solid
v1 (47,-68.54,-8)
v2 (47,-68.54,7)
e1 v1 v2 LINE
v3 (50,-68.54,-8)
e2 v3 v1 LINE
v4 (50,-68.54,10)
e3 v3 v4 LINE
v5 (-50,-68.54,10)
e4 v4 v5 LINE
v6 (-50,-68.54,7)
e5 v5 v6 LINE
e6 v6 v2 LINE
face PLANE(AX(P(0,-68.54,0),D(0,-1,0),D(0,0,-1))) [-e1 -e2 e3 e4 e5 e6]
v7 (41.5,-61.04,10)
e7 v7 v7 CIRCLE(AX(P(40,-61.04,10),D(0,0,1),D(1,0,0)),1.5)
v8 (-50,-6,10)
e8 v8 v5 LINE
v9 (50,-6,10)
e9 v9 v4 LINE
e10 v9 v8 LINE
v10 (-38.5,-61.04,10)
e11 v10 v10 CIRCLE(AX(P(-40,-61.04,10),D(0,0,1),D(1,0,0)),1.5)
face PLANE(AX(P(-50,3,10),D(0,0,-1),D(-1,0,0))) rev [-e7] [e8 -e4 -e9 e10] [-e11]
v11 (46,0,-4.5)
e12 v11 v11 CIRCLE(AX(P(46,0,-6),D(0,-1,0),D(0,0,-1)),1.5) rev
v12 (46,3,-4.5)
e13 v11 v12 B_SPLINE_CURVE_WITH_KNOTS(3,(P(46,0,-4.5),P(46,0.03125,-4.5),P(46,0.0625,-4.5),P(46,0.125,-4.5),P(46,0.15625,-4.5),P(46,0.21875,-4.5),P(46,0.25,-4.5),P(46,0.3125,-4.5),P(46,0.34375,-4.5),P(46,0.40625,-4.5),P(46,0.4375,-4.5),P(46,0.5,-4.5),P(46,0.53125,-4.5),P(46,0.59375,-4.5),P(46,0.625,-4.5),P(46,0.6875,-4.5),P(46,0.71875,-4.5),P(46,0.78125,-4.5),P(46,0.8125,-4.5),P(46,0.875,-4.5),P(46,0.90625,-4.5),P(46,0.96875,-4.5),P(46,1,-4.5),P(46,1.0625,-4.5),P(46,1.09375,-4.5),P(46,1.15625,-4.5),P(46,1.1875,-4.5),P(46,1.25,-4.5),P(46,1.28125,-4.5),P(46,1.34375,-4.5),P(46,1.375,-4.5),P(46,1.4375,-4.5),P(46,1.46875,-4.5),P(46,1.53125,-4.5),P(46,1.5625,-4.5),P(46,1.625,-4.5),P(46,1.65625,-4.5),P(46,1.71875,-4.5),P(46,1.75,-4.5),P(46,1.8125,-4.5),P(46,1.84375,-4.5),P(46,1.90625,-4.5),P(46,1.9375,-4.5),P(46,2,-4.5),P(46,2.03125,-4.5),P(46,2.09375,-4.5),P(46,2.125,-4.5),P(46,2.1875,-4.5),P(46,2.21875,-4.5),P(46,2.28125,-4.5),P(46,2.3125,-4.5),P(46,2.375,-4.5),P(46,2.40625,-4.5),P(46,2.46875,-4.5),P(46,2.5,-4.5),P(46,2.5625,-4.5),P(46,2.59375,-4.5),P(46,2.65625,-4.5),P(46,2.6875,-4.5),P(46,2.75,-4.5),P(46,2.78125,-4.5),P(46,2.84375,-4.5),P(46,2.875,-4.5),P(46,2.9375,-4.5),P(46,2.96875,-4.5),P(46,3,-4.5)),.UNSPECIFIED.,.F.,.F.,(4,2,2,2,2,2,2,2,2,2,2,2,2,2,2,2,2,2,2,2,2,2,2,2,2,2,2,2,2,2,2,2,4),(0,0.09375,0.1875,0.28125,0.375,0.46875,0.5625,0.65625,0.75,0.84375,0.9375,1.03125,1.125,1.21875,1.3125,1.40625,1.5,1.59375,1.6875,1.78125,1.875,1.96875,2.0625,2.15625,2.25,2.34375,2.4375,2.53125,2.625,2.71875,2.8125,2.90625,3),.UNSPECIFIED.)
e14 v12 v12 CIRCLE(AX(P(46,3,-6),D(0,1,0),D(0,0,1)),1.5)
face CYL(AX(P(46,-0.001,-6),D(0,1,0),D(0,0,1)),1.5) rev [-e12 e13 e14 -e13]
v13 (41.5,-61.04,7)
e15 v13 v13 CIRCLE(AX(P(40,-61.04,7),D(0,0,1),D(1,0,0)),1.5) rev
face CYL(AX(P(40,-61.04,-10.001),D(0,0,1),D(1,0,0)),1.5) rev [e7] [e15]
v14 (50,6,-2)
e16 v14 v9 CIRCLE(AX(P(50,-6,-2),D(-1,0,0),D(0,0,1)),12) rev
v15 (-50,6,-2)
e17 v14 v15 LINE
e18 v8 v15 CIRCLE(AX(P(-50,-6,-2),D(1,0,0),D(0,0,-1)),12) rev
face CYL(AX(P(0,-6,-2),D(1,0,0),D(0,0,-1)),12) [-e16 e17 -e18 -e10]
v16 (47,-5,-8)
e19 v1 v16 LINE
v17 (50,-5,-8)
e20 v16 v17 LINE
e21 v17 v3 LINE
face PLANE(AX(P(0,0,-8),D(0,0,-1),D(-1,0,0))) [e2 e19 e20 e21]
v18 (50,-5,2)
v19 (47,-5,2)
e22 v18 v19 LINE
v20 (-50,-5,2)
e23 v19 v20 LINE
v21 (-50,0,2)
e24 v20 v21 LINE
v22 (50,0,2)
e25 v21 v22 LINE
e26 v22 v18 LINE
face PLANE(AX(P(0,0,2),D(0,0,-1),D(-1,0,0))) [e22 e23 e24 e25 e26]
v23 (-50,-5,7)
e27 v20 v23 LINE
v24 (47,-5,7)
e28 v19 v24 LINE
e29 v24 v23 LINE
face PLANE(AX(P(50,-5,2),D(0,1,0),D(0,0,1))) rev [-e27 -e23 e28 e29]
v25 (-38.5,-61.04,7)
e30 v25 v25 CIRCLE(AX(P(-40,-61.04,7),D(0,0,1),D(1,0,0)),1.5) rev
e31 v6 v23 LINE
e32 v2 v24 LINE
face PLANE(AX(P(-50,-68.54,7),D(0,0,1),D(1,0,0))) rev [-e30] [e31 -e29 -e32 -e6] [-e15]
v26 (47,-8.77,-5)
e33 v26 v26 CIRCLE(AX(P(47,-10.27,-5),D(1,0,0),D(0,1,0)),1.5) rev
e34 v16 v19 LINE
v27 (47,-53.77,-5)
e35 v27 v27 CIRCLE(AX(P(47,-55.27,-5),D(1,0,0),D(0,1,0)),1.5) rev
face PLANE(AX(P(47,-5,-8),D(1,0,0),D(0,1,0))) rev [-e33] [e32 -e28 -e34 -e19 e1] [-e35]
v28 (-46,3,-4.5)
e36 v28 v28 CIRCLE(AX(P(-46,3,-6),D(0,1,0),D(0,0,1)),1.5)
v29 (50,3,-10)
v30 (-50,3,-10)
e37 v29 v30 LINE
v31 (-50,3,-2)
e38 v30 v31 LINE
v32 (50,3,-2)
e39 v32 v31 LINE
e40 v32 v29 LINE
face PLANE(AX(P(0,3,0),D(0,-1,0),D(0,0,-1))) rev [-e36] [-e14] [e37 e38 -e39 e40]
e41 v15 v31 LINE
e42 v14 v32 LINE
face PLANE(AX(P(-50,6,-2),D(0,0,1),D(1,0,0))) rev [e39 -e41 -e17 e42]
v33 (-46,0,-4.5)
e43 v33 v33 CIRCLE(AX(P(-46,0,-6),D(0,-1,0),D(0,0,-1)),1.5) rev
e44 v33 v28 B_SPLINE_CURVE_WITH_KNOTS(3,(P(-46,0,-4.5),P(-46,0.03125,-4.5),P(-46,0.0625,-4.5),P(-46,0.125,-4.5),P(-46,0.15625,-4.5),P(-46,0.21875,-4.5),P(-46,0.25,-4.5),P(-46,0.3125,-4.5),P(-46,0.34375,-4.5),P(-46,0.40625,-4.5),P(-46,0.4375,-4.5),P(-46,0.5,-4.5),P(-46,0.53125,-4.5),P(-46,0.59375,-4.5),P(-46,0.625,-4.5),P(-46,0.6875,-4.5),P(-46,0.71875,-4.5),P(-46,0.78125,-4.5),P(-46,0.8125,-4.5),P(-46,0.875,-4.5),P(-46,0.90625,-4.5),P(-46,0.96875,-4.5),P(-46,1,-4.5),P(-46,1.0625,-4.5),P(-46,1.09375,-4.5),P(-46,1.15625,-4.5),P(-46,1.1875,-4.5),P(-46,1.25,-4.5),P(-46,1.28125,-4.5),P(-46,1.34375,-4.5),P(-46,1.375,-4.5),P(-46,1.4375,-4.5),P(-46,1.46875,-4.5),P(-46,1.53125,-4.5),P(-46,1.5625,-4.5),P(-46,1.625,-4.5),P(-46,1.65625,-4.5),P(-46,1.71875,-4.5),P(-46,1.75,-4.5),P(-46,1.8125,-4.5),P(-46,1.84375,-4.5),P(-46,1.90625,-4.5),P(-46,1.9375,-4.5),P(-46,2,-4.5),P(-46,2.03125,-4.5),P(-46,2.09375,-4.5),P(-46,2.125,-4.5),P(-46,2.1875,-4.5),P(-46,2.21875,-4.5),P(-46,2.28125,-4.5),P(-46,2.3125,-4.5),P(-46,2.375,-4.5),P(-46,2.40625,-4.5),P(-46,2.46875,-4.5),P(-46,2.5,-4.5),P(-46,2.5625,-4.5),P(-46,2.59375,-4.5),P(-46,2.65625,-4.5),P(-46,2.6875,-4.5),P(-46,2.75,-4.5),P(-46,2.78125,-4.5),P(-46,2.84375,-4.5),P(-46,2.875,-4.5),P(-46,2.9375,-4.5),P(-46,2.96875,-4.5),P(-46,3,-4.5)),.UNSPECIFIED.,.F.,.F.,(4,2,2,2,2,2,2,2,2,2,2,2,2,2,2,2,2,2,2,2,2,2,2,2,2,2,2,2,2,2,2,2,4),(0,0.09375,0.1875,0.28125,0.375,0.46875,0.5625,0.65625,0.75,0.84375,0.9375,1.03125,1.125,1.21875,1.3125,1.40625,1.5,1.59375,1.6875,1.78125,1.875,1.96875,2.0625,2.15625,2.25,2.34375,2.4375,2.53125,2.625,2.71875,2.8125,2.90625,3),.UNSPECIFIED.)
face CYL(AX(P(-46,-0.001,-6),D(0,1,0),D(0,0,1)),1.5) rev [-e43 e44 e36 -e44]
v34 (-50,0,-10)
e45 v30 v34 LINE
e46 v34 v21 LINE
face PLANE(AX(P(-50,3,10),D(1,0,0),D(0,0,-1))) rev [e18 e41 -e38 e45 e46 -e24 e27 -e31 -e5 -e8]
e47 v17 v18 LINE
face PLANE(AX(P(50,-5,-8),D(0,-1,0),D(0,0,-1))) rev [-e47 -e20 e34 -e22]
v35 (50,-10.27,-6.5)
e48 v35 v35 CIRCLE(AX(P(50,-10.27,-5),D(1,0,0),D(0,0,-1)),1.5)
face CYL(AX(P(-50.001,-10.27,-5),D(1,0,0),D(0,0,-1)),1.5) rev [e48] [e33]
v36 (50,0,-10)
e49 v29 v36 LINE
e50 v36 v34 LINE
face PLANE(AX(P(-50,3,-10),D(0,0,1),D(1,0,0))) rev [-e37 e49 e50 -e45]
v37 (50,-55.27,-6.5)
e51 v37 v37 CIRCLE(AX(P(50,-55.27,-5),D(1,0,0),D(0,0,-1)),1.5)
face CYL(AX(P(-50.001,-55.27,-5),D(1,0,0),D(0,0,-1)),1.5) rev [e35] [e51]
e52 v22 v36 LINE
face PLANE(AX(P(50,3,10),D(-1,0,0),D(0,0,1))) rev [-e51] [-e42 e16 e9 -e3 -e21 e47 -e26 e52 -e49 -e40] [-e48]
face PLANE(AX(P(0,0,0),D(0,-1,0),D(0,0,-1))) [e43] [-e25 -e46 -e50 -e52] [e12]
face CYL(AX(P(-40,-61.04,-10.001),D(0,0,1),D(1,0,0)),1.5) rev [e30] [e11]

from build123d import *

# Parameters (mm, degrees)
SKETCH1_W           = 100
SKETCH1_H           = 20
BOSS_EXTRUDE1_DEPTH = 3
CUT_EXTRUDE1_REACH  = 53.078
SKETCH2_R           = 1.5
LPATTERN1_COUNT     = 2
LPATTERN1_PITCH     = 92
SKETCH3_W           = 100
SKETCH3_H           = 3
BOSS_EXTRUDE2_DEPTH = 68.54
SKETCH4_W           = 100
SKETCH4_H           = 5
BOSS_EXTRUDE3_DEPTH = 5
SKETCH5_W           = 100
SKETCH5_H           = 12
BOSS_EXTRUDE4_DEPTH = 3
FILLET4_R           = 12
SKETCH6_W           = 3
SKETCH6_H           = 63.54
BOSS_EXTRUDE5_DEPTH = 15
CUT_EXTRUDE2_REACH  = 123.646
SKETCH7_R           = 1.5
CUT_EXTRUDE3_REACH  = 89.165
SKETCH8_R           = 1.5
LPATTERN2_COUNT     = 2
LPATTERN2_PITCH     = 80


with BuildPart() as part:
    # Sketch1 → Boss-Extrude1 (new body)
    with BuildSketch(Plane(origin=(0, 0, 0), x_dir=(1, 0, 0), z_dir=(0, 1, 0))):
        Rectangle(SKETCH1_W, SKETCH1_H)
    extrude(amount=BOSS_EXTRUDE1_DEPTH)

    # Sketch2 → Cut-Extrude1 (cut, up to next)
    with BuildSketch(Plane(origin=(0, 3, 0), x_dir=(1, 0, 0), z_dir=(0, 1, 0)), mode=Mode.PRIVATE) as cut_extrude1_sk1:
        with Locations(Location((-46, 6, 0), (0, 0, 270))):
            Circle(SKETCH2_R)
    cut_extrude1_tool1 = extrude(cut_extrude1_sk1.sketch, amount=-CUT_EXTRUDE1_REACH, mode=Mode.PRIVATE) & part.part
    cut_extrude1 = cut_extrude1_tool1.solids().sort_by_distance((-46, 3, -6))[0]
    add(cut_extrude1, mode=Mode.SUBTRACT)

    # LPattern1: Cut-Extrude1 ×2
    with Locations(*[(i * LPATTERN1_PITCH, 0, 0) for i in range(1, LPATTERN1_COUNT)]):
        add(cut_extrude1, mode=Mode.SUBTRACT)

    # Sketch3 → Boss-Extrude2 (add)
    with BuildSketch(Plane.XZ):
        with Locations((0, 8.5)):
            Rectangle(SKETCH3_W, SKETCH3_H)
    extrude(amount=BOSS_EXTRUDE2_DEPTH)

    # Sketch4 → Boss-Extrude3 (add)
    with BuildSketch(Plane(origin=(0, 0, 7), x_dir=(-1, 0, 0), z_dir=(0, 0, -1))):
        with Locations((0, -2.5)):
            Rectangle(SKETCH4_W, SKETCH4_H)
    extrude(amount=BOSS_EXTRUDE3_DEPTH)

    # Sketch5 → Boss-Extrude4 (add)
    with BuildSketch(Plane(origin=(0, 3, 0), x_dir=(1, 0, 0), z_dir=(0, 1, 0))):
        with Locations((0, -4)):
            Rectangle(SKETCH5_W, SKETCH5_H)
    extrude(amount=BOSS_EXTRUDE4_DEPTH)

    # Fillet4
    fillet4_edges = [part.edges().sort_by_distance(p)[0] for p in [
        (0, 6, 10),
    ]]
    fillet(fillet4_edges, radius=FILLET4_R - 0.0001)  # a hair under: the kernel refuses the full size

    # Sketch6 → Boss-Extrude5 (add)
    with BuildSketch(Plane(origin=(0, 0, 7), x_dir=(-1, 0, 0), z_dir=(0, 0, -1))):
        with Locations((-48.5, -36.77)):
            Rectangle(SKETCH6_W, SKETCH6_H)
    extrude(amount=BOSS_EXTRUDE5_DEPTH)

    # Sketch7 → Cut-Extrude2 (cut, up to next)
    with BuildSketch(Plane(origin=(50, 0, 0), x_dir=(0, 0, -1), z_dir=(1, 0, 0)), mode=Mode.PRIVATE) as cut_extrude2_sk1:
        with Locations((5, -10.27)):
            Circle(SKETCH7_R)
    cut_extrude2_tool1 = extrude(cut_extrude2_sk1.sketch, amount=-CUT_EXTRUDE2_REACH, mode=Mode.PRIVATE) & part.part
    # Sketch7 → Cut-Extrude2 (cut, up to next)
    with BuildSketch(Plane(origin=(50, 0, 0), x_dir=(0, 0, -1), z_dir=(1, 0, 0)), mode=Mode.PRIVATE) as cut_extrude2_sk2:
        with Locations((5, -55.27)):
            Circle(SKETCH7_R)
    cut_extrude2_tool2 = extrude(cut_extrude2_sk2.sketch, amount=-CUT_EXTRUDE2_REACH, mode=Mode.PRIVATE) & part.part
    add(cut_extrude2_tool1.solids().sort_by_distance((50, -10.27, -5))[0], mode=Mode.SUBTRACT)
    add(cut_extrude2_tool2.solids().sort_by_distance((50, -55.27, -5))[0], mode=Mode.SUBTRACT)

    # Sketch8 → Cut-Extrude3 (cut, up to next)
    with BuildSketch(Plane.XY.offset(10), mode=Mode.PRIVATE) as cut_extrude3_sk1:
        with Locations((-40, -61.04)):
            Circle(SKETCH8_R)
    cut_extrude3_tool1 = extrude(cut_extrude3_sk1.sketch, amount=-CUT_EXTRUDE3_REACH, mode=Mode.PRIVATE) & part.part
    cut_extrude3 = cut_extrude3_tool1.solids().sort_by_distance((-40, -61.04, 10))[0]
    add(cut_extrude3, mode=Mode.SUBTRACT)

    # LPattern2: Cut-Extrude3 ×2
    with Locations(*[(i * LPATTERN2_PITCH, 0, 0) for i in range(1, LPATTERN2_COUNT)]):
        add(cut_extrude3, mode=Mode.SUBTRACT)


solid = part.part
